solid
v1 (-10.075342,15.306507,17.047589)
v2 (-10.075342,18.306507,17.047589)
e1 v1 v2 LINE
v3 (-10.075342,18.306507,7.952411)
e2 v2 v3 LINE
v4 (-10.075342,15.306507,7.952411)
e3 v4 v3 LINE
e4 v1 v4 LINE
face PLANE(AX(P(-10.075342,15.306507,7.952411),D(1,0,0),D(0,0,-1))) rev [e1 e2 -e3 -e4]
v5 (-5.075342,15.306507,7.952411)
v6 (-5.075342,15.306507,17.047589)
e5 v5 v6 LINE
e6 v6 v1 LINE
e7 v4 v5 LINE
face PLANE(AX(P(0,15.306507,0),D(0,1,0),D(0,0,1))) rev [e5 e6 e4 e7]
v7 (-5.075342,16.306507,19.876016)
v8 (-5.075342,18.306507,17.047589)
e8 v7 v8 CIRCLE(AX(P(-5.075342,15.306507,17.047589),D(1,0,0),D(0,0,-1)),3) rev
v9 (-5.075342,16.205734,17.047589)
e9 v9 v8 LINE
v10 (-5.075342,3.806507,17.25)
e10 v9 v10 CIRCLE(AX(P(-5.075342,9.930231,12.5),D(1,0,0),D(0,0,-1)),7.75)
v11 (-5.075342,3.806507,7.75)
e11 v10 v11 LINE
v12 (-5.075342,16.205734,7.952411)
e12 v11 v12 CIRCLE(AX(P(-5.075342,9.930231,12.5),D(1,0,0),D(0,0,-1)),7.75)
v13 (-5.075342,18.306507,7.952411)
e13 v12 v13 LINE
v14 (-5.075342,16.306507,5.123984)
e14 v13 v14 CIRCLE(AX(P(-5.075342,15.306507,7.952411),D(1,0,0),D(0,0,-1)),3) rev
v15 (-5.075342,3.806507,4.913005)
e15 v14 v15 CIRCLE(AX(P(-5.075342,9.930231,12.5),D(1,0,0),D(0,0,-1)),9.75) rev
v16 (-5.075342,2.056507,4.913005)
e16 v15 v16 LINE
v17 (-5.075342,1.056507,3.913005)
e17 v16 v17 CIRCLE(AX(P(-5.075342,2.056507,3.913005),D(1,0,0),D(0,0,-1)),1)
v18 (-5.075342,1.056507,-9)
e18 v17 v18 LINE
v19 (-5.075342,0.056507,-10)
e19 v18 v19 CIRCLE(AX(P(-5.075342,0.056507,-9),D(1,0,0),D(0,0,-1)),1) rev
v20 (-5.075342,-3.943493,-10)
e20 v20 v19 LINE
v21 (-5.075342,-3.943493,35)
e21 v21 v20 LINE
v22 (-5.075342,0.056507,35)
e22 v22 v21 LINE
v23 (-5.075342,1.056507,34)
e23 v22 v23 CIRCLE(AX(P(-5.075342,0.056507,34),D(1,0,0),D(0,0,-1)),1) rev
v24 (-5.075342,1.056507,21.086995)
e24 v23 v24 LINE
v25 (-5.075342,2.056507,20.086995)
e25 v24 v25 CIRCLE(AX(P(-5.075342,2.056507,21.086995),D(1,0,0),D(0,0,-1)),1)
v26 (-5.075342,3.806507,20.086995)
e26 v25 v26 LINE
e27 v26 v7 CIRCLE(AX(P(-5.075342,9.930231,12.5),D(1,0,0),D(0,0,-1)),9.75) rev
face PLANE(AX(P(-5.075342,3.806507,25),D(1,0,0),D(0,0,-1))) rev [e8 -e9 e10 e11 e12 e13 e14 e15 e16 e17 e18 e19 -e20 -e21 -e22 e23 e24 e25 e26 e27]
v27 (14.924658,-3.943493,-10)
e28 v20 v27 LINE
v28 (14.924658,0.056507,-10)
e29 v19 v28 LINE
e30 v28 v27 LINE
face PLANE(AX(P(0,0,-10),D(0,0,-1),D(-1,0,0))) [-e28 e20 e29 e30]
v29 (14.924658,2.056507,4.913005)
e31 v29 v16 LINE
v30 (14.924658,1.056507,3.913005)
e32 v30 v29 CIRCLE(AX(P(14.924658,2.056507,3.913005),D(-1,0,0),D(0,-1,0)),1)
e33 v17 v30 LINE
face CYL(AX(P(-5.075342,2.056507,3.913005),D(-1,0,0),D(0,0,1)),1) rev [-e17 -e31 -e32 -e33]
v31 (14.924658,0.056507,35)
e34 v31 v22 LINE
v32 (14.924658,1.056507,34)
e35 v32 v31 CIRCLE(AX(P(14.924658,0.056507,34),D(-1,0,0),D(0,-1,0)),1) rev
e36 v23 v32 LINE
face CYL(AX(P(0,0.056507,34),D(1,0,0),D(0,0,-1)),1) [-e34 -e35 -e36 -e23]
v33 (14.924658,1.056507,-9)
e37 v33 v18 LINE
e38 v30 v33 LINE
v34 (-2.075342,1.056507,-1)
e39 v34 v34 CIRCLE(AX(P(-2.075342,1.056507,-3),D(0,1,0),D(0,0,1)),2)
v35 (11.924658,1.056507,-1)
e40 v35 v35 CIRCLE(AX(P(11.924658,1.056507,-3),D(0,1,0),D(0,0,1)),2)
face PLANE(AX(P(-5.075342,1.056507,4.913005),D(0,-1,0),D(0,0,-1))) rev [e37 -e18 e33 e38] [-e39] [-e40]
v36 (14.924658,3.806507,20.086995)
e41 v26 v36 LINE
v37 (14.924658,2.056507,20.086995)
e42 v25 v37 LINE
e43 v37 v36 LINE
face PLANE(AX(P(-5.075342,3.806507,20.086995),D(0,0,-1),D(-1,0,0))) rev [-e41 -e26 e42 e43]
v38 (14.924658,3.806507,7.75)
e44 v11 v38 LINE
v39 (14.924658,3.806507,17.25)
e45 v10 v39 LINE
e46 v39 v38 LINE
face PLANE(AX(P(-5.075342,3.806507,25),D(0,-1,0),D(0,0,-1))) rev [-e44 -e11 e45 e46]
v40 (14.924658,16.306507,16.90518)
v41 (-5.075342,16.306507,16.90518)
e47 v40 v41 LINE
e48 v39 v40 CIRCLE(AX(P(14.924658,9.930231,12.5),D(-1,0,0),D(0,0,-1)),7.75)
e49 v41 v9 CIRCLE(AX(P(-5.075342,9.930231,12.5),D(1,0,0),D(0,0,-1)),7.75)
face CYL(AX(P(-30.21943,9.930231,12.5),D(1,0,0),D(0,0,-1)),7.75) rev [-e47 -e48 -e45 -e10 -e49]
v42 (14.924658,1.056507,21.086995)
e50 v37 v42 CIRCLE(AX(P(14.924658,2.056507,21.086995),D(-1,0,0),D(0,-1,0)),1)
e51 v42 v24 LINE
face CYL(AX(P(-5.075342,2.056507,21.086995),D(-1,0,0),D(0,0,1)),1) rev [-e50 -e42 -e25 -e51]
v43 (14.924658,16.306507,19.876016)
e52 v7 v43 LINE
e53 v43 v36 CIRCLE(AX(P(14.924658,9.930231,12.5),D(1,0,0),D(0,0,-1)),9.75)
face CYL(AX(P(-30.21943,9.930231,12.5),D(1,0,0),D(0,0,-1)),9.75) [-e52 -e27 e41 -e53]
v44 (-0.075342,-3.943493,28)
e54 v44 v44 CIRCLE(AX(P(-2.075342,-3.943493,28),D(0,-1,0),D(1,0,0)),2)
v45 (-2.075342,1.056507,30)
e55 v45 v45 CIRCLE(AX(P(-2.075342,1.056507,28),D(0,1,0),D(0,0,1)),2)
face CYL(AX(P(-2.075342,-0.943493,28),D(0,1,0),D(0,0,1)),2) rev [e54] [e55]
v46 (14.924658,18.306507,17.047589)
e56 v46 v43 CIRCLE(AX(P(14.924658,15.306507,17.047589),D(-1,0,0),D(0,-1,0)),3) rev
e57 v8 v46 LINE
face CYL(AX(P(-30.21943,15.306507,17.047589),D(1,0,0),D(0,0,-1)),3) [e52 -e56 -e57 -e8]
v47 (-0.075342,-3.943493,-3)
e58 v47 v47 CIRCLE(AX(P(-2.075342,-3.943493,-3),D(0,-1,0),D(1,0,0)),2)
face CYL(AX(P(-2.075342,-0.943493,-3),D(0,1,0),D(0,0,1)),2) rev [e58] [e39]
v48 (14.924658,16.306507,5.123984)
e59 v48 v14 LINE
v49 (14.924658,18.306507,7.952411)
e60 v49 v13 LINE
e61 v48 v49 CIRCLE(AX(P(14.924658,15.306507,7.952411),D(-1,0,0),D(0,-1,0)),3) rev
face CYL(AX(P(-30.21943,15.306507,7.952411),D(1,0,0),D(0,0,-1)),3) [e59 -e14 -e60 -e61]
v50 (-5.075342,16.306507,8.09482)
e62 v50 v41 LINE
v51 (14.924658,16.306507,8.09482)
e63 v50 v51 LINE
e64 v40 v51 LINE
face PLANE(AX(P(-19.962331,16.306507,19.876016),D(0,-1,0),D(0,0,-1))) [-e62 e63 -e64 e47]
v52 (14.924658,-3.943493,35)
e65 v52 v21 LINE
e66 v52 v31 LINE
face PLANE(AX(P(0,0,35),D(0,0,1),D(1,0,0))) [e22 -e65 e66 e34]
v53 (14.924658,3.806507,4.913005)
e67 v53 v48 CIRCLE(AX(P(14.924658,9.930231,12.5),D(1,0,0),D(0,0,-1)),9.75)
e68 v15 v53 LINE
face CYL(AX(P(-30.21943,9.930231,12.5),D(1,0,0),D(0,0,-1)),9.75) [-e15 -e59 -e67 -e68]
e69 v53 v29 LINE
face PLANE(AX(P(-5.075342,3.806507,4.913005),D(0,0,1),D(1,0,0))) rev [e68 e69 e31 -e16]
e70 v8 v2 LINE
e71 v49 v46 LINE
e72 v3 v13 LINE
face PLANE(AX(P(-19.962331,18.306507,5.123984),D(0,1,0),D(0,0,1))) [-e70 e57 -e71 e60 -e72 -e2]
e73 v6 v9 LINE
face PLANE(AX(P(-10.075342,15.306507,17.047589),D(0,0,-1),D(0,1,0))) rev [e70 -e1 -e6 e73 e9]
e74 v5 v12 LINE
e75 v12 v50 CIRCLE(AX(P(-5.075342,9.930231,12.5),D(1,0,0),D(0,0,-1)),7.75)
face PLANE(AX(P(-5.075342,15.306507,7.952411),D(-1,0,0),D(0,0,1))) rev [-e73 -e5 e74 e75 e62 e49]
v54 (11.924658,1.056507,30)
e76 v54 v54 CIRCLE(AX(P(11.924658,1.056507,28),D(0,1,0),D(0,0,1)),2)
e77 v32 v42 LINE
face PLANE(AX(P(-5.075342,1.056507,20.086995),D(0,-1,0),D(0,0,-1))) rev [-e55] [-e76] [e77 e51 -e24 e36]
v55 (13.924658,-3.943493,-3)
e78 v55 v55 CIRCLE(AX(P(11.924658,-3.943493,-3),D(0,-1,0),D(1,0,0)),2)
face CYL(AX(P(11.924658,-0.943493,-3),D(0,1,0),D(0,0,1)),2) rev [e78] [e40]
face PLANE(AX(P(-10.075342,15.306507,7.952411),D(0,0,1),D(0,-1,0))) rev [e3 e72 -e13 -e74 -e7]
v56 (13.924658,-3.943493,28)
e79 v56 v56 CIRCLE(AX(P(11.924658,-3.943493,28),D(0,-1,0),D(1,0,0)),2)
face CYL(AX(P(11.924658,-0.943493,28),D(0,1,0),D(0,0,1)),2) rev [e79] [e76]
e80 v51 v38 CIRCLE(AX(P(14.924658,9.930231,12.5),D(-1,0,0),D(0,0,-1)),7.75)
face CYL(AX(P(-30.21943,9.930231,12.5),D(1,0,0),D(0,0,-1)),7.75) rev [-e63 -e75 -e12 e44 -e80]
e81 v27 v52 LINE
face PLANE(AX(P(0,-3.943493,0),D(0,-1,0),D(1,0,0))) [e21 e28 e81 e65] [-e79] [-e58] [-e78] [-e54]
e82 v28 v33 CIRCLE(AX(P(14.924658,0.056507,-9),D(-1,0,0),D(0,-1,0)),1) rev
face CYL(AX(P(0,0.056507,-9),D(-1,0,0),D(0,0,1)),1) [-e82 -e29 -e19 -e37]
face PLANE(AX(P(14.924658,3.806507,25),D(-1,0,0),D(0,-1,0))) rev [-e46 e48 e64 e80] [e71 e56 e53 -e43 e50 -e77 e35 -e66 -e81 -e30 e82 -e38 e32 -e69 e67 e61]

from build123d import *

# Parameters (mm, degrees)
SKETCH1_W           = 20
SKETCH1_H           = 4.75
BOSS_EXTRUDE1_DEPTH = 25
BOSS_EXTRUDE3_DEPTH = 20
SKETCH5_W           = 4.913004547
SKETCH5_H           = 2.75
CUT_EXTRUDE1_DEPTH  = 38.5807331
SKETCH9_W           = 20.464128198
SKETCH9_H           = 5.182266339
CUT_EXTRUDE3_DEPTH  = 38.5807331
SKETCH10_W          = 14.752031578
SKETCH10_H          = 2
BOSS_EXTRUDE4_DEPTH = 20
FILLET1_R           = 3
FILLET2_R           = 3
SKETCH11_W          = 20
SKETCH11_H          = 2
BOSS_EXTRUDE5_DEPTH = 10
SKETCH12_W          = 20
SKETCH12_H          = 2
BOSS_EXTRUDE6_DEPTH = 10
FILLET5_R           = 1
FILLET6_R           = 1
SKETCH13_R          = 2
CUT_EXTRUDE4_DEPTH  = 42.776882393
FILLET7_R           = 1
FILLET8_R           = 1
SKETCH14_W          = 7
SKETCH14_H          = 2
BOSS_EXTRUDE7_DEPTH = 5
SKETCH15_W          = 5
SKETCH15_H          = 9.09517733
BOSS_EXTRUDE8_DEPTH = 3
SKETCH16_W          = 20
SKETCH16_H          = 45
SKETCH16_R          = 2
BOSS_EXTRUDE9_DEPTH = 3


with BuildPart() as part:
    # Sketch1 → Boss-Extrude1 (new body)
    with BuildSketch(Plane.XY):
        with Locations((4.924657534, 1.431506849)):
            Rectangle(SKETCH1_W, SKETCH1_H)
    extrude(amount=BOSS_EXTRUDE1_DEPTH)

    # Sketch2 → Boss-Extrude3 (add)
    with BuildSketch(Plane(origin=(14.924657534, 0, 0), x_dir=(0, 0, -1), z_dir=(1, 0, 0))):
        with BuildLine():
            Line((-7.75, 3.806506849), (-4.913004547, 3.806506849))
            ThreePointArc((-4.913004547, 3.806506849), (-12.5, 19.680231206), (-20.086995453, 3.806506849))
            Line((-20.086995453, 3.806506849), (-17.25, 3.806506849))
            ThreePointArc((-17.25, 3.806506849), (-12.5, 17.680231206), (-7.75, 3.806506849))
        make_face()
    extrude(amount=-BOSS_EXTRUDE3_DEPTH)

    # Sketch5 → Cut-Extrude1 (cut, through all)
    with BuildSketch(Plane(origin=(14.924657534, 0, 0), x_dir=(0, 0, -1), z_dir=(1, 0, 0))):
        with Locations((-22.543497727, 2.431506849)):
            Rectangle(SKETCH5_W, SKETCH5_H)
        with Locations((-2.456502273, 2.431506849)):
            Rectangle(SKETCH5_W, SKETCH5_H)
    extrude(amount=-CUT_EXTRUDE1_DEPTH, mode=Mode.SUBTRACT)

    # Sketch9 → Cut-Extrude3 (cut, through all)
    with BuildSketch(Plane(origin=(14.924657534, 0, 0), x_dir=(0, 0, -1), z_dir=(1, 0, 0))):
        with Locations((-12.097906115, 18.897640018)):
            Rectangle(SKETCH9_W, SKETCH9_H)
    extrude(amount=-CUT_EXTRUDE3_DEPTH, mode=Mode.SUBTRACT)

    # Sketch10 → Boss-Extrude4 (add)
    with BuildSketch(Plane(origin=(14.924657534, 0, 0), x_dir=(0, 0, -1), z_dir=(1, 0, 0))):
        with Locations((-12.5, 17.306506849)):
            Rectangle(SKETCH10_W, SKETCH10_H)
    extrude(amount=-BOSS_EXTRUDE4_DEPTH)

    # Fillet1
    # the kernel refuses this fillet: 3 mm, written as the material it takes off along each edge
    with BuildSketch(Plane(origin=(21.995725346, 18.306506849, 5.123984211), x_dir=(0, -1, 0), z_dir=(-1, 0, 0))) as fillet1_piece_1:
        with BuildLine():
            CenterArc((3, 2.828427125), FILLET1_R, 180, 70.528779366)
            Line((0, 2.828427125), (-0.06, 2.828427125))
            Line((-0.06, 2.828427125), (-0.06, 0))
            Line((-0.06, 0), (0, -0.06))
            ThreePointArc((0, -0.06), (1, -0.06), (1.98, -0.056568542))
            Line((1.98, -0.056568542), (2, 0))
        make_face()
    extrude(amount=34.142135624, mode=Mode.SUBTRACT)

    # Fillet2
    # the kernel refuses this fillet: 3 mm, written as the material it takes off along each edge
    with BuildSketch(Plane(origin=(21.995725346, 18.306506849, 19.876015789), x_dir=(0, -1, 0), z_dir=(-1, 0, 0))) as fillet2_piece_1:
        with BuildLine():
            CenterArc((3, -2.828427125), FILLET2_R, 109.471220634, 70.528779366)
            Line((0, -2.828427125), (-0.06, -2.828427125))
            Line((-0.06, -2.828427125), (-0.06, 0))
            Line((-0.06, 0), (0, 0.06))
            ThreePointArc((0, 0.06), (1, 0.06), (1.98, 0.056568542))
            Line((1.98, 0.056568542), (2, 0))
        make_face()
    extrude(amount=34.142135624, mode=Mode.SUBTRACT)

    # Sketch11 → Boss-Extrude5 (add)
    with BuildSketch(Plane(origin=(0, 0, 0), x_dir=(-1, 0, 0), z_dir=(0, 0, -1))):
        with Locations((-4.924657534, 0.056506849)):
            Rectangle(SKETCH11_W, SKETCH11_H)
    extrude(amount=BOSS_EXTRUDE5_DEPTH)

    # Sketch12 → Boss-Extrude6 (add)
    with BuildSketch(Plane.XY.offset(25)):
        with Locations((4.924657534, 0.056506849)):
            Rectangle(SKETCH12_W, SKETCH12_H)
    extrude(amount=BOSS_EXTRUDE6_DEPTH)

    # Fillet5
    fillet5_edges = [part.edges().sort_by_distance(p)[0] for p in [
        (4.924657534, 1.056506849, 35),
    ]]
    fillet(fillet5_edges, radius=FILLET5_R)

    # Fillet6
    fillet6_edges = [part.edges().sort_by_distance(p)[0] for p in [
        (4.924657534, 1.056506849, -10),
    ]]
    fillet(fillet6_edges, radius=FILLET6_R)

    # Sketch13 → Cut-Extrude4 (cut, through all)
    with BuildSketch(Plane(origin=(0, 1.056506849, 0), x_dir=(1, 0, 0), z_dir=(0, 1, 0))):
        with Locations(Location((-2.075342466, -28, 0), (0, 0, 270))):
            Circle(SKETCH13_R)
        with Locations(Location((11.924657534, -28, 0), (0, 0, 270))):
            Circle(SKETCH13_R)
        with Locations(Location((11.924657534, 3, 0), (0, 0, 270))):
            Circle(SKETCH13_R)
        with Locations(Location((-2.075342466, 3, 0), (0, 0, 270))):
            Circle(SKETCH13_R)
    extrude(amount=-CUT_EXTRUDE4_DEPTH, mode=Mode.SUBTRACT)

    # Fillet7
    fillet7_edges = [part.edges().sort_by_distance(p)[0] for p in [
        (4.924657534, 1.056506849, 20.086995453),
    ]]
    fillet(fillet7_edges, radius=FILLET7_R)

    # Fillet8
    fillet8_edges = [part.edges().sort_by_distance(p)[0] for p in [
        (4.924657534, 1.056506849, 4.913004547),
    ]]
    fillet(fillet8_edges, radius=FILLET8_R)



with BuildPart() as body_2:
    # Sketch14 → Boss-Extrude7 (new body)
    with BuildSketch(Plane.ZY.offset(5.075342466)):
        with Locations((12.767411335, 17.306506849)):
            Rectangle(SKETCH14_W, SKETCH14_H)
    extrude(amount=BOSS_EXTRUDE7_DEPTH)


with BuildPart() as part_1:
    add(part.part)

    add(body_2.part)  # Boss-Extrude8 merges body 2
    # Sketch15 → Boss-Extrude8 (add)
    with BuildSketch(Plane.XZ.offset(-18.306506849)):
        with Locations((-7.575342466, 12.5)):
            Rectangle(SKETCH15_W, SKETCH15_H)
    extrude(amount=BOSS_EXTRUDE8_DEPTH)

    # Sketch16 → Boss-Extrude9 (add)
    with BuildSketch(Plane.XZ.offset(0.943493151)):
        with Locations((4.924657534, 12.5)):
            Rectangle(SKETCH16_W, SKETCH16_H)
        with Locations(Location((11.924657534, -3, 0), (0, 0, 90))):
            Circle(SKETCH16_R, mode=Mode.SUBTRACT)
        with Locations(Location((11.924657534, 28, 0), (0, 0, 90))):
            Circle(SKETCH16_R, mode=Mode.SUBTRACT)
        with Locations(Location((-2.075342466, 28, 0), (0, 0, 90))):
            Circle(SKETCH16_R, mode=Mode.SUBTRACT)
        with Locations(Location((-2.075342466, -3, 0), (0, 0, 90))):
            Circle(SKETCH16_R, mode=Mode.SUBTRACT)
    extrude(amount=BOSS_EXTRUDE9_DEPTH)


solid = part_1.part
